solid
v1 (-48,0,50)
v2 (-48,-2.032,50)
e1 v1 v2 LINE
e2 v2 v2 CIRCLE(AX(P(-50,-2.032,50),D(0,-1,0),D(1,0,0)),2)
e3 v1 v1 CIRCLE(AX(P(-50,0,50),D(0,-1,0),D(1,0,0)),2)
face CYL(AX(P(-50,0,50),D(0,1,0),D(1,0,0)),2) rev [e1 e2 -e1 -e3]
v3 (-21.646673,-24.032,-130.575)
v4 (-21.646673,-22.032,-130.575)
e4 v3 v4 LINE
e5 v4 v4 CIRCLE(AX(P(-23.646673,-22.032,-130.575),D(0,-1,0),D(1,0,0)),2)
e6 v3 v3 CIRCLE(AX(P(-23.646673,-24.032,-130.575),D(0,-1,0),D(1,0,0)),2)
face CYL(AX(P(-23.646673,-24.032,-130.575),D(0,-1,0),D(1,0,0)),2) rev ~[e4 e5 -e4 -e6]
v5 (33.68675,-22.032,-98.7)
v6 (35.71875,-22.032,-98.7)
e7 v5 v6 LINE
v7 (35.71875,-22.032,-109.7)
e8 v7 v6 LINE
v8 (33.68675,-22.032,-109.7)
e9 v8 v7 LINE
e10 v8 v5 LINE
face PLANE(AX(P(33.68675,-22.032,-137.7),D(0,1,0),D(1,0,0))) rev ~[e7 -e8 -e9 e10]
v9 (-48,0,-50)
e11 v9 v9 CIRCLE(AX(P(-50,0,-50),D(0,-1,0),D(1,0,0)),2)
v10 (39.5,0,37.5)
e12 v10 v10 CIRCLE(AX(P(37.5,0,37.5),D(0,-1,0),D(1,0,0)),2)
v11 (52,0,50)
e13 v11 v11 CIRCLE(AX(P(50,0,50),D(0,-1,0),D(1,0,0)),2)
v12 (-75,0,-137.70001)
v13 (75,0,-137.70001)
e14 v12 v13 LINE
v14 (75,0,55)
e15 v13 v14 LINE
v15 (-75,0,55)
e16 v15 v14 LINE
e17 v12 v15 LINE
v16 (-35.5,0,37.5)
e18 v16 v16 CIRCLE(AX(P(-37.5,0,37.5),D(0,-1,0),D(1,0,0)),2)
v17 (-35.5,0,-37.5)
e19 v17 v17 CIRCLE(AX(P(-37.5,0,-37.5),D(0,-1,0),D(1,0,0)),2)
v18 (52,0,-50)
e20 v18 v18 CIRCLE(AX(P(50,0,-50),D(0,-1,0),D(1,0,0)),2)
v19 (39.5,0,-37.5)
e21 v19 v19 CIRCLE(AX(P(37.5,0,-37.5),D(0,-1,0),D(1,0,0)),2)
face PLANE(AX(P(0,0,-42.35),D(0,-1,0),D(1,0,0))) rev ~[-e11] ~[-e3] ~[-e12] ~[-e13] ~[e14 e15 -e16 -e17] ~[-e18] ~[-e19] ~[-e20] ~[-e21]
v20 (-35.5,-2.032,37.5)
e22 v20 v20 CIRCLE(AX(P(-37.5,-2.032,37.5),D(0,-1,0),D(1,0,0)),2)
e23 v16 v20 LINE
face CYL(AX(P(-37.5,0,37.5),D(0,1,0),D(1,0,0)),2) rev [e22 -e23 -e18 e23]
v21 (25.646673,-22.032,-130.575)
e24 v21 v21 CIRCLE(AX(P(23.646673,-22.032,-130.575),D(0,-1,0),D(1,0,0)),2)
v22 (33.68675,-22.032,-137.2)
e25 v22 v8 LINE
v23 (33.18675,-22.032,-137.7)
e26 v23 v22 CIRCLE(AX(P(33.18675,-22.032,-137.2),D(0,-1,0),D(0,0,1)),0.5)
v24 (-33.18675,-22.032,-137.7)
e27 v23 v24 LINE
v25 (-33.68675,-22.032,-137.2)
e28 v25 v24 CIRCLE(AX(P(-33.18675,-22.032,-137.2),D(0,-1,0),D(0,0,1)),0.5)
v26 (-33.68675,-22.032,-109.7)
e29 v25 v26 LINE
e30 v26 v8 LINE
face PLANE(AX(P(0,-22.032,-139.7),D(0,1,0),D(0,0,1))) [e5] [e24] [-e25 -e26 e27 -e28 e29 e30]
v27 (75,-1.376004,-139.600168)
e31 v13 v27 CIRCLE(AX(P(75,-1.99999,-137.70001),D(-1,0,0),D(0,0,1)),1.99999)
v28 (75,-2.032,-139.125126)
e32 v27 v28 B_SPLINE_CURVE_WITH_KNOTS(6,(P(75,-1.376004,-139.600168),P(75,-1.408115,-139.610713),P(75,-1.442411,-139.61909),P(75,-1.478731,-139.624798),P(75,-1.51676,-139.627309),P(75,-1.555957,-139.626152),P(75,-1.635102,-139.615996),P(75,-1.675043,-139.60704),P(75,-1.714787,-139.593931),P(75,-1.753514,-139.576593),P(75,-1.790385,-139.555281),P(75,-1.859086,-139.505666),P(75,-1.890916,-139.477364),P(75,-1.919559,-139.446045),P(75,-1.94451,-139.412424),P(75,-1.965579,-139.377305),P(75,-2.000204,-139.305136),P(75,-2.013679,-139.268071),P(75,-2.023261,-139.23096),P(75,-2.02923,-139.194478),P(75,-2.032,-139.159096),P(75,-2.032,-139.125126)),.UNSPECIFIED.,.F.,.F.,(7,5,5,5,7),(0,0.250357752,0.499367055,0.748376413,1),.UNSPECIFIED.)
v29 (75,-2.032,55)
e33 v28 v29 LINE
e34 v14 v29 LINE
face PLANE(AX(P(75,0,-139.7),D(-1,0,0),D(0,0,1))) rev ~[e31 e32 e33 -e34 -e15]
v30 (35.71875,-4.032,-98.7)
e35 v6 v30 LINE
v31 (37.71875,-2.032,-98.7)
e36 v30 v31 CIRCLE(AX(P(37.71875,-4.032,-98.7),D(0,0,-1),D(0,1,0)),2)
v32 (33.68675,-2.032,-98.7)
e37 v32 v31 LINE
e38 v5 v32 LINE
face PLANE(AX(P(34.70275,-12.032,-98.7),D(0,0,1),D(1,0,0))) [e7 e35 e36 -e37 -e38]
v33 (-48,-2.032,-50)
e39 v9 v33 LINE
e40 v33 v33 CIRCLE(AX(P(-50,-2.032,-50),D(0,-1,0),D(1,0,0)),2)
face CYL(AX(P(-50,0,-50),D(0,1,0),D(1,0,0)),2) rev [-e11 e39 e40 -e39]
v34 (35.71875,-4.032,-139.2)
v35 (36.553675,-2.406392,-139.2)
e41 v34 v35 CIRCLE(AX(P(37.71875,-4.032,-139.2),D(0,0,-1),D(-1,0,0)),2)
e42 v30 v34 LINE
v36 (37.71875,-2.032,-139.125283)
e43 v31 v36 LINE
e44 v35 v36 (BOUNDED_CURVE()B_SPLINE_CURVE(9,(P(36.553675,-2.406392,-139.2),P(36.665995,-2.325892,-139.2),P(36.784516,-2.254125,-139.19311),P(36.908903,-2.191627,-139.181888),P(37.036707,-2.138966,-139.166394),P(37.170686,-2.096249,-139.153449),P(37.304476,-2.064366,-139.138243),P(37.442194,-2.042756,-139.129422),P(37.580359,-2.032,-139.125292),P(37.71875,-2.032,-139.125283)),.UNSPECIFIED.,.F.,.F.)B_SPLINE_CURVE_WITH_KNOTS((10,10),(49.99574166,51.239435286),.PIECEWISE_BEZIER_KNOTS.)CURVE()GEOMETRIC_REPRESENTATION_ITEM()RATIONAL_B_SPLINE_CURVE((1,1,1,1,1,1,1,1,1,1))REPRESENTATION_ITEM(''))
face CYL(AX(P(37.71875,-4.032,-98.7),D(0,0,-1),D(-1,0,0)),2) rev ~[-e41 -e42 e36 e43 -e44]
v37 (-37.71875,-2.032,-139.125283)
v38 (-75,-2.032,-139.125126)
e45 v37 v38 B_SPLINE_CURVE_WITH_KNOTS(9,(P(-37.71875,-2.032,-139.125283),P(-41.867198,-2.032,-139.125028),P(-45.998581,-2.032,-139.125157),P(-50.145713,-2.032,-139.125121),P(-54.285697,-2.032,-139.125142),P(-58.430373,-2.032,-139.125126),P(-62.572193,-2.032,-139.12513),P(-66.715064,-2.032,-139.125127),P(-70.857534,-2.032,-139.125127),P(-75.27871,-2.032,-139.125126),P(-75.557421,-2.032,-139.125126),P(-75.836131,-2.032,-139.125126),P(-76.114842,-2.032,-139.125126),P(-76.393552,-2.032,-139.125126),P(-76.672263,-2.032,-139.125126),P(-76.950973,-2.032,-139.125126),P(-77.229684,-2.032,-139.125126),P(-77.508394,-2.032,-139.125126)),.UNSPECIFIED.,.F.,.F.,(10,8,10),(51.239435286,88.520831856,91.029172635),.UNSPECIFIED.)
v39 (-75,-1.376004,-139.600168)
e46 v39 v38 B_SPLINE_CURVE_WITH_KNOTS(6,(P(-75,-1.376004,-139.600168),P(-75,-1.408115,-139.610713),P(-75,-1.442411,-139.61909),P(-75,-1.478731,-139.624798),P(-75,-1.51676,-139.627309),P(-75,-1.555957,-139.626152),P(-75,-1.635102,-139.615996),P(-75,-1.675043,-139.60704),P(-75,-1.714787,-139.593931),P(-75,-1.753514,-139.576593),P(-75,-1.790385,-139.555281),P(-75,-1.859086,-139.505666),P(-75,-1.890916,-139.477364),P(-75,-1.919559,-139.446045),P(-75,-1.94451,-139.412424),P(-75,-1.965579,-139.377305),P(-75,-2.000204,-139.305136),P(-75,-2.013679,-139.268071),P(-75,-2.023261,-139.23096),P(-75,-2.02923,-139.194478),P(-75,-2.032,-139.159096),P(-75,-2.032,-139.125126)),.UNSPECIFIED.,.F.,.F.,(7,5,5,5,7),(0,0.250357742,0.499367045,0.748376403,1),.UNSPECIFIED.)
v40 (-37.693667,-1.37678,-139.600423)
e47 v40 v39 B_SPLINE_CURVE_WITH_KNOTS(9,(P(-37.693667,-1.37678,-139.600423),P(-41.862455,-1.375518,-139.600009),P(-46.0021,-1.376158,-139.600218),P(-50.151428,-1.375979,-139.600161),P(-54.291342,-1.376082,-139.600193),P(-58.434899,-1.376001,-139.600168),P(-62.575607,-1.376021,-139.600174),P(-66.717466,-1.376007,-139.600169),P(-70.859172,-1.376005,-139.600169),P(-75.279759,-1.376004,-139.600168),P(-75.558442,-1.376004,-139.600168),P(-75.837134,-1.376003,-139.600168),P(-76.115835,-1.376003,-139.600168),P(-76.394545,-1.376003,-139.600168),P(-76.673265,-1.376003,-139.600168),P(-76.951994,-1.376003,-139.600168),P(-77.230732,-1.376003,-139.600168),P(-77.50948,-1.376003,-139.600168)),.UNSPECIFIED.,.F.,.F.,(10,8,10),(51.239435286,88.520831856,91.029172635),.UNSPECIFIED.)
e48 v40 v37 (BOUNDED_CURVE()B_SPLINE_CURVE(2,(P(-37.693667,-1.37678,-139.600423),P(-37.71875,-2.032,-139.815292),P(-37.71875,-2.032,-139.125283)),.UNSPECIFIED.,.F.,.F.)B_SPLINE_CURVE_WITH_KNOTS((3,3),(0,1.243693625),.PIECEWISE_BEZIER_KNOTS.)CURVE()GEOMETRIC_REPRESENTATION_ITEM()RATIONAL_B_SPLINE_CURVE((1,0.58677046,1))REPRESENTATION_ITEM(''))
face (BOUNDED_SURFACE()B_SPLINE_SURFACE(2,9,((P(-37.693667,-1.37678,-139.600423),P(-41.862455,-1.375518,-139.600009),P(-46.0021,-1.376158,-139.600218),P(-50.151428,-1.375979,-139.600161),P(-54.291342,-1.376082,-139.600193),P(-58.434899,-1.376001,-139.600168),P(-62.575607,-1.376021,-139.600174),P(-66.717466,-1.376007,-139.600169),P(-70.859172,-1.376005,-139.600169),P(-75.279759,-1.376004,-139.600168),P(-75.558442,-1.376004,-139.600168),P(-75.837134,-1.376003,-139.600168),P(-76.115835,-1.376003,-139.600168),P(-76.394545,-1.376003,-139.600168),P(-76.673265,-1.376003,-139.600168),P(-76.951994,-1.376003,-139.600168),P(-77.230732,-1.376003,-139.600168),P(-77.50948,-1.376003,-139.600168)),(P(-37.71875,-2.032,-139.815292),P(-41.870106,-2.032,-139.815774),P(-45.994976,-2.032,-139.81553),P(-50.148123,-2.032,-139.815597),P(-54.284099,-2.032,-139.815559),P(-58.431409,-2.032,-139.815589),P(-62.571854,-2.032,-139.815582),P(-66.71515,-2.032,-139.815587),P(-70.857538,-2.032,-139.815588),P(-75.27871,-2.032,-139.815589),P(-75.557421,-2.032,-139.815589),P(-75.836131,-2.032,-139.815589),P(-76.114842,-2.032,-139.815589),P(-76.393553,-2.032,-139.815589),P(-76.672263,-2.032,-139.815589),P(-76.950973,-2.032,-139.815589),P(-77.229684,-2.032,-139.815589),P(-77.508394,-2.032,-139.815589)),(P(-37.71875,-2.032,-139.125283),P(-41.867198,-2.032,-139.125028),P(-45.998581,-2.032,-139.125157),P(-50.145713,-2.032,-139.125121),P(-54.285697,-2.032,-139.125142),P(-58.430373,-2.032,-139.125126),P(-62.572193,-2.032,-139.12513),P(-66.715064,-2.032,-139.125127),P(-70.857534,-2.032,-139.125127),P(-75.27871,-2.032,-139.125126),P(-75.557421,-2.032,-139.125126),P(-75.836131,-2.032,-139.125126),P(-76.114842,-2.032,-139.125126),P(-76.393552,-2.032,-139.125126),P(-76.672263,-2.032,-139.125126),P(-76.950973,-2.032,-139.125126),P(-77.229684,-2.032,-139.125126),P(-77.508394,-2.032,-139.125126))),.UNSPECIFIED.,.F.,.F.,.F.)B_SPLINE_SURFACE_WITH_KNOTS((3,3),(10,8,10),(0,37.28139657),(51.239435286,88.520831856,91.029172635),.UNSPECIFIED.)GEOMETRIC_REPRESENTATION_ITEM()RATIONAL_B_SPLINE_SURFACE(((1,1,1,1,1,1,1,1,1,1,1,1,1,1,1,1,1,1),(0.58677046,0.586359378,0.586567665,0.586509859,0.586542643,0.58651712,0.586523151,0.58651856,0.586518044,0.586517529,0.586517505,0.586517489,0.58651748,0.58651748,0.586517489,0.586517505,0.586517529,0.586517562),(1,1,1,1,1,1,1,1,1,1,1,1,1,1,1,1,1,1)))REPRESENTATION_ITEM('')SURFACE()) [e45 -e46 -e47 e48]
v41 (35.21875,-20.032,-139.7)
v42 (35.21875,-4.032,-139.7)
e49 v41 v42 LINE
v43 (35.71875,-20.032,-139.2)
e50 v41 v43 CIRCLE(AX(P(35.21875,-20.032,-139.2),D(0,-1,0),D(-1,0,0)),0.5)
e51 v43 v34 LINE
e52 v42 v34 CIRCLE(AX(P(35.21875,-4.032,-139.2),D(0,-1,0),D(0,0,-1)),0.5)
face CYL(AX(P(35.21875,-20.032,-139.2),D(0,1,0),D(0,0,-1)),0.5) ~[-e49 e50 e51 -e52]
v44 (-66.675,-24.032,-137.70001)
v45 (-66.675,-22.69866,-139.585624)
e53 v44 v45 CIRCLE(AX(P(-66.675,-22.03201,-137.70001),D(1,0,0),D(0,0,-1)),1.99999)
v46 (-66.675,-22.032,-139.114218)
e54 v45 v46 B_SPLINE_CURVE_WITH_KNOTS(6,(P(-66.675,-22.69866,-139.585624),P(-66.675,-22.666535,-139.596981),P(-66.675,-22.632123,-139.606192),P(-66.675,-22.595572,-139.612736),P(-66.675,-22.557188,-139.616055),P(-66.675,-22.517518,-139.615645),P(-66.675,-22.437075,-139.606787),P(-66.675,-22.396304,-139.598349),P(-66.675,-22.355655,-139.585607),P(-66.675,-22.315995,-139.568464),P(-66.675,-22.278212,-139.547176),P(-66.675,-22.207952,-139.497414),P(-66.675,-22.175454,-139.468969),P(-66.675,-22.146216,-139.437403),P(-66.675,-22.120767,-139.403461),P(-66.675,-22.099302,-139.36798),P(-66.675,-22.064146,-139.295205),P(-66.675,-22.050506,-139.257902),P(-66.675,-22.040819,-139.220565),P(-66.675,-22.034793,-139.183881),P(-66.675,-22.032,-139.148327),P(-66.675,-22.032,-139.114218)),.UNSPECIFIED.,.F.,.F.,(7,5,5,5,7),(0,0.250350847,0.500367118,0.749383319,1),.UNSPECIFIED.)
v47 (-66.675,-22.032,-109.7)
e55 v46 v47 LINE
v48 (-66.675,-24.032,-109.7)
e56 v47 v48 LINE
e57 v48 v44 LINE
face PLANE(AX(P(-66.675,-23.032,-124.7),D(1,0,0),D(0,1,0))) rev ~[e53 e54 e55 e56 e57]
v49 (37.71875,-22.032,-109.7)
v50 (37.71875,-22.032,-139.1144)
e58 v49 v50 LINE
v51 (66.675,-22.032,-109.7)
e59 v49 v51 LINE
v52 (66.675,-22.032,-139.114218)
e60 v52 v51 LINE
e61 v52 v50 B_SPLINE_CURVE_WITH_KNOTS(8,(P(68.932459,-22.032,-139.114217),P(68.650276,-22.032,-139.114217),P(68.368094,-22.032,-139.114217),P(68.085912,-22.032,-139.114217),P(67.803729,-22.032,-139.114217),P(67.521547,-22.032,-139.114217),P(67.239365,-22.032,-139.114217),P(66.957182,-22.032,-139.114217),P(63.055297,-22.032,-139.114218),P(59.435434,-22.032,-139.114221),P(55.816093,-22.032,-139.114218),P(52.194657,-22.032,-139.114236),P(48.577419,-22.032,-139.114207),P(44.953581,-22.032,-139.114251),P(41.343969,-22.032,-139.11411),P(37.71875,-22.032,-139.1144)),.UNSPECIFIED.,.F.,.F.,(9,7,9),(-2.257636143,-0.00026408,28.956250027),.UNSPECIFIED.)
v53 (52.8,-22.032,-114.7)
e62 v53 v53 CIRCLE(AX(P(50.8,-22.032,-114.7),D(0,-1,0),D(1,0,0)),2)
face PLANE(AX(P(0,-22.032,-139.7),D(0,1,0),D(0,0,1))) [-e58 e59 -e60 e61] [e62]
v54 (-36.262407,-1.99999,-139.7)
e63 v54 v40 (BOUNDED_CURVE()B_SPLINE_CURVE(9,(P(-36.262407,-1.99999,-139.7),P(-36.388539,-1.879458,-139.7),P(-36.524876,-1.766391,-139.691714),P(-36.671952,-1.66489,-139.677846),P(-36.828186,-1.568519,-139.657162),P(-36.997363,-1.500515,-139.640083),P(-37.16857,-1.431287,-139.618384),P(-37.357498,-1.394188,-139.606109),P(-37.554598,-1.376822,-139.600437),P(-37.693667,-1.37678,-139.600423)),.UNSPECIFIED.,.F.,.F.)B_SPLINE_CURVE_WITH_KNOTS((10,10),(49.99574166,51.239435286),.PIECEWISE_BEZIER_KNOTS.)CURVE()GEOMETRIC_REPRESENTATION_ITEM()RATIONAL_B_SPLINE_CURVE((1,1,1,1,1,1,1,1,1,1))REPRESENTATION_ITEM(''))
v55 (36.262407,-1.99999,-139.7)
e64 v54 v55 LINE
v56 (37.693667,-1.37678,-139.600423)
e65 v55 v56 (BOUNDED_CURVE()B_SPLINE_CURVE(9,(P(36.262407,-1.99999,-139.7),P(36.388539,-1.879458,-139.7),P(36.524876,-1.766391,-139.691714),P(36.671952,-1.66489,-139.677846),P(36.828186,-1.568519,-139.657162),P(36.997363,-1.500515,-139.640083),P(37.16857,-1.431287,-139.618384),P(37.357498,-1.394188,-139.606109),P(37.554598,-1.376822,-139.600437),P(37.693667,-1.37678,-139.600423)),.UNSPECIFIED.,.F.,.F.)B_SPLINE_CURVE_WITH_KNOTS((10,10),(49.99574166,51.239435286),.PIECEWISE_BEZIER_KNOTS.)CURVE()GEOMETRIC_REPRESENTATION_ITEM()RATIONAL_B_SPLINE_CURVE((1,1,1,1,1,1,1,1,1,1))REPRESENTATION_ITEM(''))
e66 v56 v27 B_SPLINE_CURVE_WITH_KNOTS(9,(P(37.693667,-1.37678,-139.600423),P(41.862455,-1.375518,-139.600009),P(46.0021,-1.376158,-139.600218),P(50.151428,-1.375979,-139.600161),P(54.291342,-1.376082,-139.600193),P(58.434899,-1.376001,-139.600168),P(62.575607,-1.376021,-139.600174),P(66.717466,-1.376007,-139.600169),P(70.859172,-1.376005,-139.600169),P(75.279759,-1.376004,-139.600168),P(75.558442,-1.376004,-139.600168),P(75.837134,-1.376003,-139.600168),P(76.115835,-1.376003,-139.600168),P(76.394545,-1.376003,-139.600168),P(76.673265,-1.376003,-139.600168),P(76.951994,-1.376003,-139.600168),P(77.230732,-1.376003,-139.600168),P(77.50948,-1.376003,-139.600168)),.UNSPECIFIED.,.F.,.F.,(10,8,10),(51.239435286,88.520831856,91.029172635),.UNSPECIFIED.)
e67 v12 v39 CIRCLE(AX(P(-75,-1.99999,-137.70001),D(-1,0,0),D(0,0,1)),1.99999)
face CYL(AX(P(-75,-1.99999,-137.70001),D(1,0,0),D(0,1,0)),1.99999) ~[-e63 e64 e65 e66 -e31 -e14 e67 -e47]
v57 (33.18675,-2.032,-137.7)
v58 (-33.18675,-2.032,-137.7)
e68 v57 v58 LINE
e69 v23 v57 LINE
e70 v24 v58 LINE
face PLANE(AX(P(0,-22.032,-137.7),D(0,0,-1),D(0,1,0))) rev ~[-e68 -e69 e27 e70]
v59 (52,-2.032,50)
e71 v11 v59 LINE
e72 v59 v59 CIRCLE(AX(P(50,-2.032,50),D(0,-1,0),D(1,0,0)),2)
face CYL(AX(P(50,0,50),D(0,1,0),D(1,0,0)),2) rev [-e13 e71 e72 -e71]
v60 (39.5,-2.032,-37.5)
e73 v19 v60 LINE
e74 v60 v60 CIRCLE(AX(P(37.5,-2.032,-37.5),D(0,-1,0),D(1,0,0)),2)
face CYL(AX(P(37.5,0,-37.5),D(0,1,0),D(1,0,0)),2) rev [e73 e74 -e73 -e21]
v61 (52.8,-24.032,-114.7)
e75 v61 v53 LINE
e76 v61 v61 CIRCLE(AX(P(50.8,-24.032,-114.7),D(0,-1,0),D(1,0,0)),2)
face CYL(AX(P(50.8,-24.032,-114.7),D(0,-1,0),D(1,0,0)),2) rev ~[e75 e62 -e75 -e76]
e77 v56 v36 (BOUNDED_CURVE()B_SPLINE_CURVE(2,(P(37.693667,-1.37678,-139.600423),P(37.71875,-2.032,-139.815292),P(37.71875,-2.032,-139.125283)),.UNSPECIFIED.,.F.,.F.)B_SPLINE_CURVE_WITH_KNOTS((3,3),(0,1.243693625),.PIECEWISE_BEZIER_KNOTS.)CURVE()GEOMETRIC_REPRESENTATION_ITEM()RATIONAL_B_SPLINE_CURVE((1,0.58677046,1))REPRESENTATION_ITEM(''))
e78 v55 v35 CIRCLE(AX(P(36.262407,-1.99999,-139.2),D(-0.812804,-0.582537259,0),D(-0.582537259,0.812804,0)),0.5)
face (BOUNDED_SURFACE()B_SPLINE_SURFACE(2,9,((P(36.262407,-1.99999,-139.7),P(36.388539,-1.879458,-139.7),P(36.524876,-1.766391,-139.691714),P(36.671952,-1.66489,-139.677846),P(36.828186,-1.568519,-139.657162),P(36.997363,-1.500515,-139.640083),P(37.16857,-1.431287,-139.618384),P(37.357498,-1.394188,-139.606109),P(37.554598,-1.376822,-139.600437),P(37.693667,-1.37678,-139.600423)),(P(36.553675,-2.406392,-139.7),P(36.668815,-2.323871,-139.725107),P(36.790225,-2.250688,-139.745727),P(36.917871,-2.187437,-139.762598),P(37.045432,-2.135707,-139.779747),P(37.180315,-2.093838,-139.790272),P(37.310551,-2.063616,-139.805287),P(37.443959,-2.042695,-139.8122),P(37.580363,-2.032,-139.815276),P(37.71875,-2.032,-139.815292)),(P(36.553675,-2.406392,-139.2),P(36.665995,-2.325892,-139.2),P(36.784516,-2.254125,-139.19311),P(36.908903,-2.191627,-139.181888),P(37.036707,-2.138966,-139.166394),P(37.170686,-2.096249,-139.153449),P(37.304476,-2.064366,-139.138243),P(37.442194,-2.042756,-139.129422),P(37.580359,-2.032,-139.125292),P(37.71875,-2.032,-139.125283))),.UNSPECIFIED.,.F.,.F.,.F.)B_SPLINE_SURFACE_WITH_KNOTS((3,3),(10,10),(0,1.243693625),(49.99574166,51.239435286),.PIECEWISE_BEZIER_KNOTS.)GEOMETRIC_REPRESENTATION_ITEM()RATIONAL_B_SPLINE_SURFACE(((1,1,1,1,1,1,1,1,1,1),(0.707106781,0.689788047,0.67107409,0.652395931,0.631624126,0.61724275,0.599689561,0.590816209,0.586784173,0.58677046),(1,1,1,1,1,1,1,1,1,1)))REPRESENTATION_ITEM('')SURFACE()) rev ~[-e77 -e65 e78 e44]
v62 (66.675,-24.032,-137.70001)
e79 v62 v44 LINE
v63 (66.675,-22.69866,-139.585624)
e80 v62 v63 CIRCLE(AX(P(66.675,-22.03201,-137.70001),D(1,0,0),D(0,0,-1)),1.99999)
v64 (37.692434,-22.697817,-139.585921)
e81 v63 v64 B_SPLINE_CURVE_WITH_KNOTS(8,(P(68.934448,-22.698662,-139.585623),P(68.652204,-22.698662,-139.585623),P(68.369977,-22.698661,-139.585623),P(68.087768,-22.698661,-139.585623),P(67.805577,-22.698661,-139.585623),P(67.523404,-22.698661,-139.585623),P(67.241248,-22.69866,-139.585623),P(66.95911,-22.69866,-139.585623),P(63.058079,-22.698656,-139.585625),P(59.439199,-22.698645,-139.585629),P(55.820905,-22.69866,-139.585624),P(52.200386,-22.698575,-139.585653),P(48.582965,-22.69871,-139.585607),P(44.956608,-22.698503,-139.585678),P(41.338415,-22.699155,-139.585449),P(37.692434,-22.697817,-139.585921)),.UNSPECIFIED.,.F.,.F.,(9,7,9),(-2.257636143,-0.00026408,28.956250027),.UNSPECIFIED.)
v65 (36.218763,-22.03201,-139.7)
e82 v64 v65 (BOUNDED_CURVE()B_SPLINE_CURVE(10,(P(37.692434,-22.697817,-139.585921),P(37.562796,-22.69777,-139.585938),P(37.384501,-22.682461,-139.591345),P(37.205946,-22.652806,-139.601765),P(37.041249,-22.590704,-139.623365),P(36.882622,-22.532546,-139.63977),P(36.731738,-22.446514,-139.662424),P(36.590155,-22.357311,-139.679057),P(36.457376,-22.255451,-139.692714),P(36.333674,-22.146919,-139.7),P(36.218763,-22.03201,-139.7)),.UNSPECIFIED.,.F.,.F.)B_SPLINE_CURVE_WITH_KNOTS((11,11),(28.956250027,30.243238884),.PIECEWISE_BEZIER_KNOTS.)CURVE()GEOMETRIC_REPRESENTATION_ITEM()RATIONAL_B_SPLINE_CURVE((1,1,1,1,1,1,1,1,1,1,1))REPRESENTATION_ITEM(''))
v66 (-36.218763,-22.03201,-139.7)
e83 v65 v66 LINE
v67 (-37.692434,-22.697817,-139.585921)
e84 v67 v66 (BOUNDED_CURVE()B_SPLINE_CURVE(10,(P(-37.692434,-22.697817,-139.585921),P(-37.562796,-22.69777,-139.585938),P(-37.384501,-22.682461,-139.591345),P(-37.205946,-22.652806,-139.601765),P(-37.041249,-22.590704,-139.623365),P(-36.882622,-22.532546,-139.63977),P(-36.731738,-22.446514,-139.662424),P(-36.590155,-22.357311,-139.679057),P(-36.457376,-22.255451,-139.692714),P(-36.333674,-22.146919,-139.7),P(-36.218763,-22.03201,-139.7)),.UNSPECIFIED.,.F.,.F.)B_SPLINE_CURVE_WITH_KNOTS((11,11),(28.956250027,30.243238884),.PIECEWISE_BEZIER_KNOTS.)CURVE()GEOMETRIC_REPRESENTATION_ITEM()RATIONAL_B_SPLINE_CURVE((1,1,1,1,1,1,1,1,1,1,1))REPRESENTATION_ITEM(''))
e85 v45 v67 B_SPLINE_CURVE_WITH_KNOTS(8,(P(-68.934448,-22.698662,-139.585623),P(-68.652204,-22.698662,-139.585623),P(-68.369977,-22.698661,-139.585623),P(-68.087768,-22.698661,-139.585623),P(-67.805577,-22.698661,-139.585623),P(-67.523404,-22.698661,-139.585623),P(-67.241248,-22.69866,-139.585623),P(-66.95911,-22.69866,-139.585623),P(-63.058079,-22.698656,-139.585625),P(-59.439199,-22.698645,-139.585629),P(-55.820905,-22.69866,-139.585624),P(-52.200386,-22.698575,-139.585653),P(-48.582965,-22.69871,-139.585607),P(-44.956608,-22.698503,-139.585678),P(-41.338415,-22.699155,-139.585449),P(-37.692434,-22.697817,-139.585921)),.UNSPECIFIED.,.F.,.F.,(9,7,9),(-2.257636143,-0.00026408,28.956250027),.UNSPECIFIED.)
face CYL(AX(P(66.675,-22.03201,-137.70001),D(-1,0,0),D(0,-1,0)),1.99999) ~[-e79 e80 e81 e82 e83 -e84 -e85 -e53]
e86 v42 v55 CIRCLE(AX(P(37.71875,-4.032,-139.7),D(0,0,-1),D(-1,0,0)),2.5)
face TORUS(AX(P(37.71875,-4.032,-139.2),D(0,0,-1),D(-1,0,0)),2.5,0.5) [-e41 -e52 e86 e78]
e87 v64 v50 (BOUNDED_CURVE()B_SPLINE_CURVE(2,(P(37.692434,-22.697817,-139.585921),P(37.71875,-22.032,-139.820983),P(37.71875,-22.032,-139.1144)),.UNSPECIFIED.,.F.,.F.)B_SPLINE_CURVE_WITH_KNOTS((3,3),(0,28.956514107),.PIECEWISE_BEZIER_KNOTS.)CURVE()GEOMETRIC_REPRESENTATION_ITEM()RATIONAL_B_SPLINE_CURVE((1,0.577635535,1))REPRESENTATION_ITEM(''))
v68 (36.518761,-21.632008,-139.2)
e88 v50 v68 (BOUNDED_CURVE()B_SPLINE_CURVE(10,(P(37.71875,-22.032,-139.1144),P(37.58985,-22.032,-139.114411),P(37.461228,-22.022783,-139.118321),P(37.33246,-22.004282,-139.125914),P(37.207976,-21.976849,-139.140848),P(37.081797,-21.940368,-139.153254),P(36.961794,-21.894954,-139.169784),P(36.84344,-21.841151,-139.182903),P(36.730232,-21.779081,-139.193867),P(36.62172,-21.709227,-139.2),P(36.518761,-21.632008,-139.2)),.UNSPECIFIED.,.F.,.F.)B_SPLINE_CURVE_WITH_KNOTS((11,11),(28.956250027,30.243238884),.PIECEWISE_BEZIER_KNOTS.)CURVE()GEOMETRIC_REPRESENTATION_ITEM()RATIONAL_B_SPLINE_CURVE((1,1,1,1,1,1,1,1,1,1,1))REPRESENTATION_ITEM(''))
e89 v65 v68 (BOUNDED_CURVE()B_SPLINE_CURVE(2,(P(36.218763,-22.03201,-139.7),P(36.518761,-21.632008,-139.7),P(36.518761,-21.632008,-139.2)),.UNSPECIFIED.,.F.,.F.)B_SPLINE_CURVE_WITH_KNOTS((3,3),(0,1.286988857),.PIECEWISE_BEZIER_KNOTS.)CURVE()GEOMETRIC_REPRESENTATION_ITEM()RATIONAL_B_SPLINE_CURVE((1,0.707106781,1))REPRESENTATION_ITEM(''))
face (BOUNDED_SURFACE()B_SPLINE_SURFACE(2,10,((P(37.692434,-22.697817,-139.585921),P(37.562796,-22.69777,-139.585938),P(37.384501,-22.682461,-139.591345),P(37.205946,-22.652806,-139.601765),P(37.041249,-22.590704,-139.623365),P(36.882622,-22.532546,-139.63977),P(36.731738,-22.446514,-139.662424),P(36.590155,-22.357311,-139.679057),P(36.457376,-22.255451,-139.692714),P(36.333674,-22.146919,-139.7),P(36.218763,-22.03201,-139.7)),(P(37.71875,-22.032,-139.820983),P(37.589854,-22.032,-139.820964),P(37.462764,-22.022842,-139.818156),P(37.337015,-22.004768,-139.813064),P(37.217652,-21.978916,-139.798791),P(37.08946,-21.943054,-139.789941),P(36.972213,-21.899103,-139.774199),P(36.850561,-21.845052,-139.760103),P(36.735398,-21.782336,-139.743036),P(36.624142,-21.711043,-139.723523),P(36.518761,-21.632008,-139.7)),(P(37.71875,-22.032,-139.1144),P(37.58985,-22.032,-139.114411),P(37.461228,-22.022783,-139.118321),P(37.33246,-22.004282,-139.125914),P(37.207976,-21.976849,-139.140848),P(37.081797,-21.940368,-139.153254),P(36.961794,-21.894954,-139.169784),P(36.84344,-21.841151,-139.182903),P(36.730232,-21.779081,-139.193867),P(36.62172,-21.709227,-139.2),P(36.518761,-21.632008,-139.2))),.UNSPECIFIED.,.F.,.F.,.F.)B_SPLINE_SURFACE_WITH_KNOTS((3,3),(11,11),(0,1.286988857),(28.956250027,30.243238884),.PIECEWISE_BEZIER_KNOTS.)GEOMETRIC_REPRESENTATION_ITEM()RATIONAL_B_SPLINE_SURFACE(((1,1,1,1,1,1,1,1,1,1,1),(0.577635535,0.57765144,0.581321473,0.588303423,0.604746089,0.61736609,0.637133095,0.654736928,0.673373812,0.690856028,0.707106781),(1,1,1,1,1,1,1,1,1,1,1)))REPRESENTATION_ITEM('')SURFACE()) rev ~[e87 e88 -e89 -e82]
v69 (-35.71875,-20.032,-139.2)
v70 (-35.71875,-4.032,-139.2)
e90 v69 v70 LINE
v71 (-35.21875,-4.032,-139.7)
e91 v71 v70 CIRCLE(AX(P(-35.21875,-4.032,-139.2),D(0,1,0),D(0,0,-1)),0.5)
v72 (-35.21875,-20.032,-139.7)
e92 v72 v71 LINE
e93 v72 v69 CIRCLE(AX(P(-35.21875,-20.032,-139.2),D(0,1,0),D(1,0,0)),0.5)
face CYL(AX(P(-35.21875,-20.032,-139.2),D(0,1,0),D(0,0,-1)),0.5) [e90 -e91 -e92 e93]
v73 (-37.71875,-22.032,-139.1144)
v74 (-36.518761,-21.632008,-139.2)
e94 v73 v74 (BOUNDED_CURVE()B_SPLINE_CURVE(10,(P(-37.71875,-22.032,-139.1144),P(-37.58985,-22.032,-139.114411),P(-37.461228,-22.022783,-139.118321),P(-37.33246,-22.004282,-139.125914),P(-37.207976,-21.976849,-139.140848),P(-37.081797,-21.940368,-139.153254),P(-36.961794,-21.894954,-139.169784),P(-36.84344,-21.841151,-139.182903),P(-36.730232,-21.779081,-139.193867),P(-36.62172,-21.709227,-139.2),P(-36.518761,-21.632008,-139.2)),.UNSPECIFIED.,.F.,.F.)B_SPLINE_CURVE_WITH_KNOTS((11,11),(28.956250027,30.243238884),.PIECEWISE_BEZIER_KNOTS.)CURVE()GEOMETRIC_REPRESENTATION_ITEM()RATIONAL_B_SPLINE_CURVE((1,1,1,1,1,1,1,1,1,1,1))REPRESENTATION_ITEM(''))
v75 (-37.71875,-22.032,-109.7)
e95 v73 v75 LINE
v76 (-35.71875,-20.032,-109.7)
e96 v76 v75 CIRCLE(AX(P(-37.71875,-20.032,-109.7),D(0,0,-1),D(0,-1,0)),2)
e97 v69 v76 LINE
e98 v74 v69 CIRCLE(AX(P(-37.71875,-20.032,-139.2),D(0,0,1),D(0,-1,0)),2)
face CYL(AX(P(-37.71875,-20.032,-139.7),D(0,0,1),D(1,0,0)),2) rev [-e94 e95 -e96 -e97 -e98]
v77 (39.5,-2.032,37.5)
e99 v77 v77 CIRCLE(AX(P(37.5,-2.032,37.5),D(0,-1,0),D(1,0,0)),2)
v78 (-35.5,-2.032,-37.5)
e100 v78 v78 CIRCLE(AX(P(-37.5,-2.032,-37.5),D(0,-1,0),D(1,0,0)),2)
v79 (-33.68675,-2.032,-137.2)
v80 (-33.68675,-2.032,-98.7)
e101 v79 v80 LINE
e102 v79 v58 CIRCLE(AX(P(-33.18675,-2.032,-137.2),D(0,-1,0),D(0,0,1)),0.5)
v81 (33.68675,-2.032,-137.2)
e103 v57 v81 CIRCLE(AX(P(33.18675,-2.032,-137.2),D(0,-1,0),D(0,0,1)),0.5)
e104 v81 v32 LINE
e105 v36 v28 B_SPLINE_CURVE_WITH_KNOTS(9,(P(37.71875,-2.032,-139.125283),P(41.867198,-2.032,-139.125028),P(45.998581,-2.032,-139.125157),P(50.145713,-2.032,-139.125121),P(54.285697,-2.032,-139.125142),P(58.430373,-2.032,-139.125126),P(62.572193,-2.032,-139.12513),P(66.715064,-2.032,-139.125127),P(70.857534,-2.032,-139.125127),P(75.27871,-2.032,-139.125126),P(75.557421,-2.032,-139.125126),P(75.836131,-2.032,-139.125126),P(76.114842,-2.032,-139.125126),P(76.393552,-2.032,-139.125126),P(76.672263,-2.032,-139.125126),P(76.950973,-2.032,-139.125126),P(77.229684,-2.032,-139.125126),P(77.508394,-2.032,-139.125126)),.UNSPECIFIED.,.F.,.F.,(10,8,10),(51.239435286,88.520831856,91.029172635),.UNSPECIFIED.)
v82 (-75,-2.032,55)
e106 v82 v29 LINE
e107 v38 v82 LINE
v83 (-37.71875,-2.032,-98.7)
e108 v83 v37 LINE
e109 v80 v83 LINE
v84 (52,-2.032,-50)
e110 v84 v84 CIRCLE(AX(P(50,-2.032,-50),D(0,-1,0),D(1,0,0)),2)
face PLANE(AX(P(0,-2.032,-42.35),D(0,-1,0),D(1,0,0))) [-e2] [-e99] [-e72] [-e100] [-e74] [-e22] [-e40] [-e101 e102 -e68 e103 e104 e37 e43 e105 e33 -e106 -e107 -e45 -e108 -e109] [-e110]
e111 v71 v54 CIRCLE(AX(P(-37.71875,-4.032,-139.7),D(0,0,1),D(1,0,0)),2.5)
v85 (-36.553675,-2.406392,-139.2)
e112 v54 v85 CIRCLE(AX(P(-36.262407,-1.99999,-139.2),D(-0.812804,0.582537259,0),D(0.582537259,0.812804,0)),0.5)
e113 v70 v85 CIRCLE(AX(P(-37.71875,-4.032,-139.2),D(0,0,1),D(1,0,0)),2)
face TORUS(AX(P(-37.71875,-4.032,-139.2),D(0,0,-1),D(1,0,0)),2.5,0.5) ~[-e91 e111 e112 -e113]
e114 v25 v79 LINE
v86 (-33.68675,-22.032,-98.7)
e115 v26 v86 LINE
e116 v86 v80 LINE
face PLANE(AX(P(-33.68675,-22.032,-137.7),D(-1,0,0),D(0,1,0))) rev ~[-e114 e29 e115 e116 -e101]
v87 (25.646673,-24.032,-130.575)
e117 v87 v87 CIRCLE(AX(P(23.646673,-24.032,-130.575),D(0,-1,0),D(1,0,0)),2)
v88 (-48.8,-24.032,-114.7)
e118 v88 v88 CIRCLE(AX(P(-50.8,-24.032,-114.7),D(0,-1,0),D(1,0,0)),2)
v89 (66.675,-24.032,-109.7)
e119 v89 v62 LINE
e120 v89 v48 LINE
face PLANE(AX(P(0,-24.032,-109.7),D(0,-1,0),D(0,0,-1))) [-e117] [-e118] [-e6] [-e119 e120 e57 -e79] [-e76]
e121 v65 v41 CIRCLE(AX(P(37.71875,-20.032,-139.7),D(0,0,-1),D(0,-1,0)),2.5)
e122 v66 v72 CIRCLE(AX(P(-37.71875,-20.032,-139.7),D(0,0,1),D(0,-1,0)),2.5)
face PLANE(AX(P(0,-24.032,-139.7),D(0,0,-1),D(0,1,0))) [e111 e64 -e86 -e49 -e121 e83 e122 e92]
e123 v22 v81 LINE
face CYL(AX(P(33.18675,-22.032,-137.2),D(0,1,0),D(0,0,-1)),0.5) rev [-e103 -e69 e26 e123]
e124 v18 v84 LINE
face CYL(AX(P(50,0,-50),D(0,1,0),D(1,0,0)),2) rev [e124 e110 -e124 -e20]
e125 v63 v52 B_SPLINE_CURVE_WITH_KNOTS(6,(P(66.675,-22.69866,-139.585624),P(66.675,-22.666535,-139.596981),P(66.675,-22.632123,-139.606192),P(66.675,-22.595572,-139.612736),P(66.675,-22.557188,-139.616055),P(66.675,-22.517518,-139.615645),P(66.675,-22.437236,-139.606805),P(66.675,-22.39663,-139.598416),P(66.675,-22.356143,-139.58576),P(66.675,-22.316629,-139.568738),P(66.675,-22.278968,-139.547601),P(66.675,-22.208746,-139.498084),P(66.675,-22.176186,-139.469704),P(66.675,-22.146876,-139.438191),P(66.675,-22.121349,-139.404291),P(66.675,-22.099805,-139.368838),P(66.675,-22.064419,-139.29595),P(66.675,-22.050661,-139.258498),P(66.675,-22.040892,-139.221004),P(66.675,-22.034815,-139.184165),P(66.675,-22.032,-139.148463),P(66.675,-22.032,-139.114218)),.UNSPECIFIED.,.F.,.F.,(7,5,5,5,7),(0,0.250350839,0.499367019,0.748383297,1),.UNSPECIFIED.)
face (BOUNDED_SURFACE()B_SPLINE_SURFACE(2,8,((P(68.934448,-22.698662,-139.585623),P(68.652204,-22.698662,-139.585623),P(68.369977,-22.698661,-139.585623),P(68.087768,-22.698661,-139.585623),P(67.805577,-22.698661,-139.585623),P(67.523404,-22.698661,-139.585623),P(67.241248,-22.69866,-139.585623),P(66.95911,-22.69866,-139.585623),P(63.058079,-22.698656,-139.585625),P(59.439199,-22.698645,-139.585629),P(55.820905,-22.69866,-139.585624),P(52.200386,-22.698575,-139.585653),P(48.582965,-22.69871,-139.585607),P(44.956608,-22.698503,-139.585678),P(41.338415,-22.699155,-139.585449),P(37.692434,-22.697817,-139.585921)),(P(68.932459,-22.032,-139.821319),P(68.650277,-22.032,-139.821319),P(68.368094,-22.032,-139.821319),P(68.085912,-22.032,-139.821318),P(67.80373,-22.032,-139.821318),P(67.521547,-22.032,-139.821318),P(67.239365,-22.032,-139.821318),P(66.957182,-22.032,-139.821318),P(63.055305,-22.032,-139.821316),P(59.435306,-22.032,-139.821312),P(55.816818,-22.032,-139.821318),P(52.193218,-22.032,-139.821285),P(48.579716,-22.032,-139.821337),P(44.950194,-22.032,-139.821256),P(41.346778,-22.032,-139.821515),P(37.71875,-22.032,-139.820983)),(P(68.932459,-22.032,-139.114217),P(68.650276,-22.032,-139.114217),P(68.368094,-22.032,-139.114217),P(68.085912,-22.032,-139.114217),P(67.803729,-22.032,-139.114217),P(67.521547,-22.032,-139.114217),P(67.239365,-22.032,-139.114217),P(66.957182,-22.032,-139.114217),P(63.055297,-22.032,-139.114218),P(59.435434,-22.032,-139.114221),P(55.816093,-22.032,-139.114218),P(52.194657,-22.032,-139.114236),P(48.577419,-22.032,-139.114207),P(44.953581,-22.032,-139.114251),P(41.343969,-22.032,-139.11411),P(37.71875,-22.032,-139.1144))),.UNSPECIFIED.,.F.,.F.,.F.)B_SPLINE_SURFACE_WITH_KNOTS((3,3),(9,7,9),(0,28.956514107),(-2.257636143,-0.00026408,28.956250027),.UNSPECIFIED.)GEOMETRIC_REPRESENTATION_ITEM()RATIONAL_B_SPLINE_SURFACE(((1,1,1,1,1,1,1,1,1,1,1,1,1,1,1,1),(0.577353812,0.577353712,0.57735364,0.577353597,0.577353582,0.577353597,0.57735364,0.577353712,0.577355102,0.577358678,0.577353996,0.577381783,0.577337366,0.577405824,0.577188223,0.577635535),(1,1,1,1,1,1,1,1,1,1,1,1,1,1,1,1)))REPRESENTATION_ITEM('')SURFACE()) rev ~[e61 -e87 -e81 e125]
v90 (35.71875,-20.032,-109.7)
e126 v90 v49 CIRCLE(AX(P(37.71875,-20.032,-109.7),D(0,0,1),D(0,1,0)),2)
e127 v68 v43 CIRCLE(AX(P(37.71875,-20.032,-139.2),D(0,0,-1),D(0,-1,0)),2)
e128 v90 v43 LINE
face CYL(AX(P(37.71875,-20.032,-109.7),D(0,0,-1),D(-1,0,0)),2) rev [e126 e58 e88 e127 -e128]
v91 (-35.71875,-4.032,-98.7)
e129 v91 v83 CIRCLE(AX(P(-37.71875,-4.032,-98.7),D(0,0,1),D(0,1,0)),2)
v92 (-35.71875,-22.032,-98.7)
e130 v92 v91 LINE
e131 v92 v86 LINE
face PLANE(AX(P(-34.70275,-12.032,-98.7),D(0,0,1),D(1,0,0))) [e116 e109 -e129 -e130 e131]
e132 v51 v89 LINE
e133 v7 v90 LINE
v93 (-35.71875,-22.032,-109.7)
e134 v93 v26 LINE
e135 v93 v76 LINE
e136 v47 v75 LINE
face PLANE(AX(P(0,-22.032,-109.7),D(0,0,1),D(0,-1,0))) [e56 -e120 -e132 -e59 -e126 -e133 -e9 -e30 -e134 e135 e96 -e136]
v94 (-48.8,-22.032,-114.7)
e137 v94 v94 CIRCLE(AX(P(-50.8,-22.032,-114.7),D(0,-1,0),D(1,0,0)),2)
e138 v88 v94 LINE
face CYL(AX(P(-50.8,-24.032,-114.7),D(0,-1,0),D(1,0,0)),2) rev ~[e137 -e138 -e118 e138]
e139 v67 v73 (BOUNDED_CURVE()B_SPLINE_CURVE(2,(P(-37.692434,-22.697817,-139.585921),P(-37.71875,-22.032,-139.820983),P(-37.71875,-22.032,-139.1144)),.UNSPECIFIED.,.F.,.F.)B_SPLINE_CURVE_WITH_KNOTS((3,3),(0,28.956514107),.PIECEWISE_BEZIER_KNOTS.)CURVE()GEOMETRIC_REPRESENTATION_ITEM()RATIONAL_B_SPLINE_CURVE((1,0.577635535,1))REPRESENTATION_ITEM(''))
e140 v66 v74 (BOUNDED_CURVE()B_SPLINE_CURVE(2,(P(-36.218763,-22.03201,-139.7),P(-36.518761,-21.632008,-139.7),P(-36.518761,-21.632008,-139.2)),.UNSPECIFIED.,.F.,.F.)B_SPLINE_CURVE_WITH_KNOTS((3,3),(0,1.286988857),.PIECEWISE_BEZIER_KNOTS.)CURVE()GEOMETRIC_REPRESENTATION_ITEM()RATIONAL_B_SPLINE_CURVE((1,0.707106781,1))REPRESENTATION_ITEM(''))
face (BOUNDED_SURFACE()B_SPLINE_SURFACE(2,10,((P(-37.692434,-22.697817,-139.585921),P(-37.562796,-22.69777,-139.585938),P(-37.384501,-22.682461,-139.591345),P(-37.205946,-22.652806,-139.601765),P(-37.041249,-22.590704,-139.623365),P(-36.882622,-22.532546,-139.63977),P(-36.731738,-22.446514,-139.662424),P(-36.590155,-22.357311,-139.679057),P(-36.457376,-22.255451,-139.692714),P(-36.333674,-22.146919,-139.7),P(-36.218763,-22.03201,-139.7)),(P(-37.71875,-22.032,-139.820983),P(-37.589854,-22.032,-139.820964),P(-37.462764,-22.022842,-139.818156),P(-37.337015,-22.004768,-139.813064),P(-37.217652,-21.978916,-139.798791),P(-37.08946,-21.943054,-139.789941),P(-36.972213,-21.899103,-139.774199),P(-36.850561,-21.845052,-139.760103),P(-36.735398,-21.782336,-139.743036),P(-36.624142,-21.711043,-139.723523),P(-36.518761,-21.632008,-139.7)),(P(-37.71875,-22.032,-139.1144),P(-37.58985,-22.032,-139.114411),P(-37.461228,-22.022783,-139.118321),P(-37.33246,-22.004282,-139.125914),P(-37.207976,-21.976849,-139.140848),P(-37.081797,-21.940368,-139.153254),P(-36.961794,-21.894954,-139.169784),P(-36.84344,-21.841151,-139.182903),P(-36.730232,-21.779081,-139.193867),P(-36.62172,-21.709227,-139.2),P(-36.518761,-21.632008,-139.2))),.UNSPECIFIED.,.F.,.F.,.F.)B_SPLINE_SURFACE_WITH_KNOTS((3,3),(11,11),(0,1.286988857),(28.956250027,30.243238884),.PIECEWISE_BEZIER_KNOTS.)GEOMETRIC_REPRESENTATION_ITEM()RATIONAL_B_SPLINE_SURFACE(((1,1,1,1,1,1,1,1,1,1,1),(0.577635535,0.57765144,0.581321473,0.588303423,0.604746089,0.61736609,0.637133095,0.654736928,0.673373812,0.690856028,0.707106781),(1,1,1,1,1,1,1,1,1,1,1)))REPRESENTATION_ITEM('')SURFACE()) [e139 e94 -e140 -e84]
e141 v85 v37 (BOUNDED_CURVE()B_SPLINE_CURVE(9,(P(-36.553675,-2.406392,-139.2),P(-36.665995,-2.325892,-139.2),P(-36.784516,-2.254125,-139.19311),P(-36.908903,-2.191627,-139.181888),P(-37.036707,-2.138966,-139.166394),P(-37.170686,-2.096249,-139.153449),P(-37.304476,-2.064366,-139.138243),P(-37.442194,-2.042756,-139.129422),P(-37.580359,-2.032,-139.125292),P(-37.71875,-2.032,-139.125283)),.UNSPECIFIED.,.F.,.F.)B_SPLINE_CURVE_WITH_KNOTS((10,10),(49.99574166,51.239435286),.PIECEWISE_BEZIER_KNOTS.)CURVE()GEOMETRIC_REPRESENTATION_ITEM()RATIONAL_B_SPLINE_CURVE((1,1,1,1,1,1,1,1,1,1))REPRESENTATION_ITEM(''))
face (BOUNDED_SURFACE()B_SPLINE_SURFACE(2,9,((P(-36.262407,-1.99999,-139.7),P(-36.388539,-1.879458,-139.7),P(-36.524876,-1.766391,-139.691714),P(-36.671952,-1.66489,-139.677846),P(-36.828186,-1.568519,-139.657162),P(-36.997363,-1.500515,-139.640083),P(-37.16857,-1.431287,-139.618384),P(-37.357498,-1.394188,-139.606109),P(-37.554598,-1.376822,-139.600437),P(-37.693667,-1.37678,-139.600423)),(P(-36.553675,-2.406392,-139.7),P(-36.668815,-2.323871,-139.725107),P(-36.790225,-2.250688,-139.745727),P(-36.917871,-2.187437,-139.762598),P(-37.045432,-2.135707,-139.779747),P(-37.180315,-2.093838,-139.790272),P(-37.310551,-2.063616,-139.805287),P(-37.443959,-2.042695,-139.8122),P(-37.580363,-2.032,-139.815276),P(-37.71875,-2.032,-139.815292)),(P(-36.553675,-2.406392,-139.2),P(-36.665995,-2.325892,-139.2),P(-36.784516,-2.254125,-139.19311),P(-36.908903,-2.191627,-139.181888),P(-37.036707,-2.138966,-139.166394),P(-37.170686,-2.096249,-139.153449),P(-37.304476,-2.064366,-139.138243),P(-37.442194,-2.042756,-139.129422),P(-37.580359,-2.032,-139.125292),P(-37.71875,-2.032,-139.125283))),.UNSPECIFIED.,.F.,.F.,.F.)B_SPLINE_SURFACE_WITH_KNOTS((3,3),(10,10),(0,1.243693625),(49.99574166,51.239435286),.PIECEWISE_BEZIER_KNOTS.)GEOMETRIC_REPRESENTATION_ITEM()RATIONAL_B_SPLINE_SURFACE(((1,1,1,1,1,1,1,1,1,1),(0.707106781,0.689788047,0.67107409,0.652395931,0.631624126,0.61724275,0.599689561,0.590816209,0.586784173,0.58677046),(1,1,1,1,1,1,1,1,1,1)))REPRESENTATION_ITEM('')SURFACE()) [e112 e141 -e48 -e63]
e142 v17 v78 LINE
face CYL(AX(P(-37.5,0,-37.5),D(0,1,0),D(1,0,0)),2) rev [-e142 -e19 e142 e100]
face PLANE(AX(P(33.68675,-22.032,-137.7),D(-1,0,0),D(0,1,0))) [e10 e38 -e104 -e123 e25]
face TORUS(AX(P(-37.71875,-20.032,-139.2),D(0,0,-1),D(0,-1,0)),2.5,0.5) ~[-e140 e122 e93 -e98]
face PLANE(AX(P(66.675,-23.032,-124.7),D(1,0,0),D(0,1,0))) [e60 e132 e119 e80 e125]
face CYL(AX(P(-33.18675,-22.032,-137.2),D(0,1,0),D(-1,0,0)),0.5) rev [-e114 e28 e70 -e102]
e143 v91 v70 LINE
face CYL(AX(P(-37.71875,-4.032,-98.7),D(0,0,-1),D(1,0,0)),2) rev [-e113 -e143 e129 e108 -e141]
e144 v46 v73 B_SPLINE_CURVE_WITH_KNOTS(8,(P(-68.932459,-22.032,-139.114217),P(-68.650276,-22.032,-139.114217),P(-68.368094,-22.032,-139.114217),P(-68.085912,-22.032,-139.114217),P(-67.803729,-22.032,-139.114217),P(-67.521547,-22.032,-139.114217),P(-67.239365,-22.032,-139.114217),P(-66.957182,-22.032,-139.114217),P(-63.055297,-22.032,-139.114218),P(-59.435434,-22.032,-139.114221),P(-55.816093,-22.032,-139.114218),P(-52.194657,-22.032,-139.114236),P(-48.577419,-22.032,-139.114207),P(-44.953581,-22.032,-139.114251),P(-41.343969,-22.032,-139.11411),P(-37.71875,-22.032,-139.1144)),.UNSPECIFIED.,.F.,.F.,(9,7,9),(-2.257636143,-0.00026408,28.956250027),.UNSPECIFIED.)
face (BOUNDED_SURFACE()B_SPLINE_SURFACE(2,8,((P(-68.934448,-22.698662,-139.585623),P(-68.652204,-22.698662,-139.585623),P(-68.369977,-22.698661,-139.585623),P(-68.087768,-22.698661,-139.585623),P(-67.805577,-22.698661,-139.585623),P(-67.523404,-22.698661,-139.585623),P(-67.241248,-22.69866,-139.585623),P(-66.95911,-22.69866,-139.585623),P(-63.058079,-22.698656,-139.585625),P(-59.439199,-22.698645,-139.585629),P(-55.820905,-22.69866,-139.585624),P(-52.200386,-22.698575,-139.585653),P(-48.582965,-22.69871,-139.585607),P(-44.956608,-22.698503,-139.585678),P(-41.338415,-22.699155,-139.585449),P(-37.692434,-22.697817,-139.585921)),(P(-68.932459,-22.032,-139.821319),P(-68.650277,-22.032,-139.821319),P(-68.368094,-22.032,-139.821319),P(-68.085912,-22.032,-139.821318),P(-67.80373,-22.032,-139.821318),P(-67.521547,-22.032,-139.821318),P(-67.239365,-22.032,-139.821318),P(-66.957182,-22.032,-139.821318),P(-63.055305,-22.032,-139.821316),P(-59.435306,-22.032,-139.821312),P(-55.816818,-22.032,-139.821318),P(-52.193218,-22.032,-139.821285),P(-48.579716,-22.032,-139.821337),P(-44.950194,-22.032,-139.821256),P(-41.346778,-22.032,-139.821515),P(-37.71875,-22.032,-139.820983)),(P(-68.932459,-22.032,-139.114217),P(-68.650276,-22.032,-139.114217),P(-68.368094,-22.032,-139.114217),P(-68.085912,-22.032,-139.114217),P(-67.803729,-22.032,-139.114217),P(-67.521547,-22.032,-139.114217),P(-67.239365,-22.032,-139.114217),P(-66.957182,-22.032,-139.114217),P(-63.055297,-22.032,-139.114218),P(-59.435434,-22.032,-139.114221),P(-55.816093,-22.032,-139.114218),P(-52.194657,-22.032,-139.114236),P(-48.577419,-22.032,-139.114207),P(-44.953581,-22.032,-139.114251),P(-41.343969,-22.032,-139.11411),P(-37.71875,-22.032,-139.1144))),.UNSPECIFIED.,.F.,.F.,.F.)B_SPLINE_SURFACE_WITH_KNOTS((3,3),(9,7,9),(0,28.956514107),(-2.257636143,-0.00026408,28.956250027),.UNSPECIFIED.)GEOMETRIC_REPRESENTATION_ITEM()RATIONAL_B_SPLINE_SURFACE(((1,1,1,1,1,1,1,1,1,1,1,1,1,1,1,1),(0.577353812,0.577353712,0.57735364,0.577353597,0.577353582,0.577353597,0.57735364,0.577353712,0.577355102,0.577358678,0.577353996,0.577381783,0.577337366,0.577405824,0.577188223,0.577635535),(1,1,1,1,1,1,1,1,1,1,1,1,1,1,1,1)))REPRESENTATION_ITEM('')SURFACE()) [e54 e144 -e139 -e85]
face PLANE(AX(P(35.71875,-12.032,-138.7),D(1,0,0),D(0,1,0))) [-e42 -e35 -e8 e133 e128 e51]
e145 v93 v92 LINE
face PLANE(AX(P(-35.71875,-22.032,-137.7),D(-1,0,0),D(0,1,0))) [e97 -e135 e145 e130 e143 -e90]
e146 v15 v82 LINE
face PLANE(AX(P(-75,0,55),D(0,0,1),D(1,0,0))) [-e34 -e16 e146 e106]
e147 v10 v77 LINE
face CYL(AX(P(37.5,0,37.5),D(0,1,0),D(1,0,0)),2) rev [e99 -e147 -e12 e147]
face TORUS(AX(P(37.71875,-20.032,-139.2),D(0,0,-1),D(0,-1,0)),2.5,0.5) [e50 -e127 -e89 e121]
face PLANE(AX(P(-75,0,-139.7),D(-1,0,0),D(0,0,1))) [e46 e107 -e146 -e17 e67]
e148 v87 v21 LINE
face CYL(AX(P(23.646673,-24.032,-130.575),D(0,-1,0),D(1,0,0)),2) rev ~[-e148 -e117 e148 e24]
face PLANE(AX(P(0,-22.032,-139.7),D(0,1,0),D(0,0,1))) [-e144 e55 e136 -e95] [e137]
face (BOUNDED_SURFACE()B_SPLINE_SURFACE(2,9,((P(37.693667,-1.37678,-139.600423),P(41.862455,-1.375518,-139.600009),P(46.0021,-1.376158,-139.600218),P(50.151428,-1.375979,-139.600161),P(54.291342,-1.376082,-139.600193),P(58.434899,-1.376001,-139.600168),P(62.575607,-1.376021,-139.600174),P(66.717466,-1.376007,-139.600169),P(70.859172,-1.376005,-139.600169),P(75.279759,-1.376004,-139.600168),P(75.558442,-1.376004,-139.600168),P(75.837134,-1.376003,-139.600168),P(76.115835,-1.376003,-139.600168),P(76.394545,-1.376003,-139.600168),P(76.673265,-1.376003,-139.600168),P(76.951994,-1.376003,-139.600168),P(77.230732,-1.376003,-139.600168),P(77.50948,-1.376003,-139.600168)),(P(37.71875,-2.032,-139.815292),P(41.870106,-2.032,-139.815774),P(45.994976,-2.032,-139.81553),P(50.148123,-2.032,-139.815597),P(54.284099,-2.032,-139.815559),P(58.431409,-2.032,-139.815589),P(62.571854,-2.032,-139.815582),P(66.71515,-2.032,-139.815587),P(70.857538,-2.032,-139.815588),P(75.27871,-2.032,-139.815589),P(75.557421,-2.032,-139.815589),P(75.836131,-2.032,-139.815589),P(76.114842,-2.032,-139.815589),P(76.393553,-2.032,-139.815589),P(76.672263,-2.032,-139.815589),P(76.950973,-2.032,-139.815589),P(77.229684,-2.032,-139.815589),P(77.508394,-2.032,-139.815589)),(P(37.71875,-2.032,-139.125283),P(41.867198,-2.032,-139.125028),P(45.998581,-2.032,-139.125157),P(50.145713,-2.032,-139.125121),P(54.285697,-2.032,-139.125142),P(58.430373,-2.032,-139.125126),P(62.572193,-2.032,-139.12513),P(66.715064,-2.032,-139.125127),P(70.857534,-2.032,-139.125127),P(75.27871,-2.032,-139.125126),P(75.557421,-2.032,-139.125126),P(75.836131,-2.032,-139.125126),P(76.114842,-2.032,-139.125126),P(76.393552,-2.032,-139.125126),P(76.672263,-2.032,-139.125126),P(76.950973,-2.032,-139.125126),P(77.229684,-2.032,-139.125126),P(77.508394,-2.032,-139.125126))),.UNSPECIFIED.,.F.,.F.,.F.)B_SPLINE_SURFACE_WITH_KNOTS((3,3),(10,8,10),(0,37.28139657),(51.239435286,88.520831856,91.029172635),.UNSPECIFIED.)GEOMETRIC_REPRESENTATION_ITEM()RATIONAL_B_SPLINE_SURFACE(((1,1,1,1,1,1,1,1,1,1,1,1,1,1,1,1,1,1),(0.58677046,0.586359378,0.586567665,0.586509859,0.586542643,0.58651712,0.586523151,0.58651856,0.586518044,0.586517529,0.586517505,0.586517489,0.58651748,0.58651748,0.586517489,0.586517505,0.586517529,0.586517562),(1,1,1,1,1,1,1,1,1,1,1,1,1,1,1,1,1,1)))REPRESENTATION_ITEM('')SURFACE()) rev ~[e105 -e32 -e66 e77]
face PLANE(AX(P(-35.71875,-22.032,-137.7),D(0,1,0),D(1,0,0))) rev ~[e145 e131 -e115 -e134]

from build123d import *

# Parameters (mm, degrees)
F0_W     = 150
F0_H     = 194.7
F0_R     = 2
F1_DEPTH = 2.032
F2_W     = 20
F2_H     = 2
F3_DEPTH = 35.71875
F4_DEPTH = 66.675
F5_R     = 2
F6_DEPTH = 2
F7_W     = 2.032
F7_H     = 20
F8_DEPTH = 39
F9_R     = 2
F10_R    = 1.99999
F11_R    = 0.5


# Not quite as in the source:
# - a fillet or chamfer is up to 0.001 mm smaller than in the source, because OpenCascade refuses the exact size


with BuildPart() as f1:
    # F0 (on Front) → F1 (new body)
    with BuildSketch(Plane.XZ):
        with Locations((0, -42.35)):
            Rectangle(F0_W, F0_H)
        with Locations((-50, -50)):
            Circle(F0_R, mode=Mode.SUBTRACT)
        with Locations((50, -50)):
            Circle(F0_R, mode=Mode.SUBTRACT)
        with Locations((-37.5, -37.5)):
            Circle(F0_R, mode=Mode.SUBTRACT)
        with Locations((-50, 50)):
            Circle(F0_R, mode=Mode.SUBTRACT)
        with Locations((-37.5, 37.5)):
            Circle(F0_R, mode=Mode.SUBTRACT)
        with Locations((37.5, -37.5)):
            Circle(F0_R, mode=Mode.SUBTRACT)
        with Locations((37.5, 37.5)):
            Circle(F0_R, mode=Mode.SUBTRACT)
        with Locations((50, 50)):
            Circle(F0_R, mode=Mode.SUBTRACT)
    extrude(amount=F1_DEPTH)

    # F2 (on Right) → F3 (join, symmetric)
    with BuildSketch(Plane.YZ):
        with Locations((-12.032, -138.7)):
            Rectangle(F2_W, F2_H)
    extrude(amount=F3_DEPTH, both=True)

    # F2 (on Right) → F4 (join, symmetric)
    with BuildSketch(Plane.YZ):
        Polygon((-24.032, -139.7), (-22.032, -139.7), (-22.032, -137.7), (-22.032, -109.7), (-24.032, -109.7), align=None)
    extrude(amount=F4_DEPTH, both=True)

    # F5 (on face) → F6 (cut, through all)
    with BuildSketch(Plane.XZ.offset(24.032)):
        with Locations((-50.8, -114.7)):
            Circle(F5_R)
        with Locations((-23.6466728747, -130.575)):
            Circle(F5_R)
        with Locations((50.8, -114.7)):
            Circle(F5_R)
        with Locations((23.6466728747, -130.575)):
            Circle(F5_R)
    extrude(amount=-F6_DEPTH, mode=Mode.SUBTRACT)

    # F7 (on face) → F8 (join)
    with BuildSketch(Plane.XY.offset(-137.7)):
        with Locations((-34.70275, -12.032)):
            Rectangle(F7_W, F7_H)
        with Locations((34.70275, -12.032)):
            Rectangle(F7_W, F7_H)
    extrude(amount=F8_DEPTH)

    # F9
    f9_edges = [f1.edges().sort_by_distance(p)[0] for p in [
        (35.71875, -2.032, -119.2),
        (35.71875, -22.032, -124.7),
        (-35.71875, -2.032, -119.2),
        (-35.71875, -22.032, -124.7),
    ]]
    fillet(f9_edges, radius=F9_R)

    # F10 (radius 2 in the source; OpenCascade refuses exactly that, so slightly less here)
    f10_edges = [f1.edges().sort_by_distance(p)[0] for p in [
        (0, 0, -139.7),
        (0, -24.032, -139.7),
    ]]
    fillet(f10_edges, radius=F10_R)

    # F11
    f11_edges = [f1.edges().sort_by_distance(p)[0] for p in [
        (-35.71875, -12.032, -139.7),
        (35.71875, -12.032, -139.7),
        (33.68675, -12.032, -137.7),
        (-33.68675, -12.032, -137.7),
    ]]
    fillet(f11_edges, radius=F11_R)


solid = f1.part
